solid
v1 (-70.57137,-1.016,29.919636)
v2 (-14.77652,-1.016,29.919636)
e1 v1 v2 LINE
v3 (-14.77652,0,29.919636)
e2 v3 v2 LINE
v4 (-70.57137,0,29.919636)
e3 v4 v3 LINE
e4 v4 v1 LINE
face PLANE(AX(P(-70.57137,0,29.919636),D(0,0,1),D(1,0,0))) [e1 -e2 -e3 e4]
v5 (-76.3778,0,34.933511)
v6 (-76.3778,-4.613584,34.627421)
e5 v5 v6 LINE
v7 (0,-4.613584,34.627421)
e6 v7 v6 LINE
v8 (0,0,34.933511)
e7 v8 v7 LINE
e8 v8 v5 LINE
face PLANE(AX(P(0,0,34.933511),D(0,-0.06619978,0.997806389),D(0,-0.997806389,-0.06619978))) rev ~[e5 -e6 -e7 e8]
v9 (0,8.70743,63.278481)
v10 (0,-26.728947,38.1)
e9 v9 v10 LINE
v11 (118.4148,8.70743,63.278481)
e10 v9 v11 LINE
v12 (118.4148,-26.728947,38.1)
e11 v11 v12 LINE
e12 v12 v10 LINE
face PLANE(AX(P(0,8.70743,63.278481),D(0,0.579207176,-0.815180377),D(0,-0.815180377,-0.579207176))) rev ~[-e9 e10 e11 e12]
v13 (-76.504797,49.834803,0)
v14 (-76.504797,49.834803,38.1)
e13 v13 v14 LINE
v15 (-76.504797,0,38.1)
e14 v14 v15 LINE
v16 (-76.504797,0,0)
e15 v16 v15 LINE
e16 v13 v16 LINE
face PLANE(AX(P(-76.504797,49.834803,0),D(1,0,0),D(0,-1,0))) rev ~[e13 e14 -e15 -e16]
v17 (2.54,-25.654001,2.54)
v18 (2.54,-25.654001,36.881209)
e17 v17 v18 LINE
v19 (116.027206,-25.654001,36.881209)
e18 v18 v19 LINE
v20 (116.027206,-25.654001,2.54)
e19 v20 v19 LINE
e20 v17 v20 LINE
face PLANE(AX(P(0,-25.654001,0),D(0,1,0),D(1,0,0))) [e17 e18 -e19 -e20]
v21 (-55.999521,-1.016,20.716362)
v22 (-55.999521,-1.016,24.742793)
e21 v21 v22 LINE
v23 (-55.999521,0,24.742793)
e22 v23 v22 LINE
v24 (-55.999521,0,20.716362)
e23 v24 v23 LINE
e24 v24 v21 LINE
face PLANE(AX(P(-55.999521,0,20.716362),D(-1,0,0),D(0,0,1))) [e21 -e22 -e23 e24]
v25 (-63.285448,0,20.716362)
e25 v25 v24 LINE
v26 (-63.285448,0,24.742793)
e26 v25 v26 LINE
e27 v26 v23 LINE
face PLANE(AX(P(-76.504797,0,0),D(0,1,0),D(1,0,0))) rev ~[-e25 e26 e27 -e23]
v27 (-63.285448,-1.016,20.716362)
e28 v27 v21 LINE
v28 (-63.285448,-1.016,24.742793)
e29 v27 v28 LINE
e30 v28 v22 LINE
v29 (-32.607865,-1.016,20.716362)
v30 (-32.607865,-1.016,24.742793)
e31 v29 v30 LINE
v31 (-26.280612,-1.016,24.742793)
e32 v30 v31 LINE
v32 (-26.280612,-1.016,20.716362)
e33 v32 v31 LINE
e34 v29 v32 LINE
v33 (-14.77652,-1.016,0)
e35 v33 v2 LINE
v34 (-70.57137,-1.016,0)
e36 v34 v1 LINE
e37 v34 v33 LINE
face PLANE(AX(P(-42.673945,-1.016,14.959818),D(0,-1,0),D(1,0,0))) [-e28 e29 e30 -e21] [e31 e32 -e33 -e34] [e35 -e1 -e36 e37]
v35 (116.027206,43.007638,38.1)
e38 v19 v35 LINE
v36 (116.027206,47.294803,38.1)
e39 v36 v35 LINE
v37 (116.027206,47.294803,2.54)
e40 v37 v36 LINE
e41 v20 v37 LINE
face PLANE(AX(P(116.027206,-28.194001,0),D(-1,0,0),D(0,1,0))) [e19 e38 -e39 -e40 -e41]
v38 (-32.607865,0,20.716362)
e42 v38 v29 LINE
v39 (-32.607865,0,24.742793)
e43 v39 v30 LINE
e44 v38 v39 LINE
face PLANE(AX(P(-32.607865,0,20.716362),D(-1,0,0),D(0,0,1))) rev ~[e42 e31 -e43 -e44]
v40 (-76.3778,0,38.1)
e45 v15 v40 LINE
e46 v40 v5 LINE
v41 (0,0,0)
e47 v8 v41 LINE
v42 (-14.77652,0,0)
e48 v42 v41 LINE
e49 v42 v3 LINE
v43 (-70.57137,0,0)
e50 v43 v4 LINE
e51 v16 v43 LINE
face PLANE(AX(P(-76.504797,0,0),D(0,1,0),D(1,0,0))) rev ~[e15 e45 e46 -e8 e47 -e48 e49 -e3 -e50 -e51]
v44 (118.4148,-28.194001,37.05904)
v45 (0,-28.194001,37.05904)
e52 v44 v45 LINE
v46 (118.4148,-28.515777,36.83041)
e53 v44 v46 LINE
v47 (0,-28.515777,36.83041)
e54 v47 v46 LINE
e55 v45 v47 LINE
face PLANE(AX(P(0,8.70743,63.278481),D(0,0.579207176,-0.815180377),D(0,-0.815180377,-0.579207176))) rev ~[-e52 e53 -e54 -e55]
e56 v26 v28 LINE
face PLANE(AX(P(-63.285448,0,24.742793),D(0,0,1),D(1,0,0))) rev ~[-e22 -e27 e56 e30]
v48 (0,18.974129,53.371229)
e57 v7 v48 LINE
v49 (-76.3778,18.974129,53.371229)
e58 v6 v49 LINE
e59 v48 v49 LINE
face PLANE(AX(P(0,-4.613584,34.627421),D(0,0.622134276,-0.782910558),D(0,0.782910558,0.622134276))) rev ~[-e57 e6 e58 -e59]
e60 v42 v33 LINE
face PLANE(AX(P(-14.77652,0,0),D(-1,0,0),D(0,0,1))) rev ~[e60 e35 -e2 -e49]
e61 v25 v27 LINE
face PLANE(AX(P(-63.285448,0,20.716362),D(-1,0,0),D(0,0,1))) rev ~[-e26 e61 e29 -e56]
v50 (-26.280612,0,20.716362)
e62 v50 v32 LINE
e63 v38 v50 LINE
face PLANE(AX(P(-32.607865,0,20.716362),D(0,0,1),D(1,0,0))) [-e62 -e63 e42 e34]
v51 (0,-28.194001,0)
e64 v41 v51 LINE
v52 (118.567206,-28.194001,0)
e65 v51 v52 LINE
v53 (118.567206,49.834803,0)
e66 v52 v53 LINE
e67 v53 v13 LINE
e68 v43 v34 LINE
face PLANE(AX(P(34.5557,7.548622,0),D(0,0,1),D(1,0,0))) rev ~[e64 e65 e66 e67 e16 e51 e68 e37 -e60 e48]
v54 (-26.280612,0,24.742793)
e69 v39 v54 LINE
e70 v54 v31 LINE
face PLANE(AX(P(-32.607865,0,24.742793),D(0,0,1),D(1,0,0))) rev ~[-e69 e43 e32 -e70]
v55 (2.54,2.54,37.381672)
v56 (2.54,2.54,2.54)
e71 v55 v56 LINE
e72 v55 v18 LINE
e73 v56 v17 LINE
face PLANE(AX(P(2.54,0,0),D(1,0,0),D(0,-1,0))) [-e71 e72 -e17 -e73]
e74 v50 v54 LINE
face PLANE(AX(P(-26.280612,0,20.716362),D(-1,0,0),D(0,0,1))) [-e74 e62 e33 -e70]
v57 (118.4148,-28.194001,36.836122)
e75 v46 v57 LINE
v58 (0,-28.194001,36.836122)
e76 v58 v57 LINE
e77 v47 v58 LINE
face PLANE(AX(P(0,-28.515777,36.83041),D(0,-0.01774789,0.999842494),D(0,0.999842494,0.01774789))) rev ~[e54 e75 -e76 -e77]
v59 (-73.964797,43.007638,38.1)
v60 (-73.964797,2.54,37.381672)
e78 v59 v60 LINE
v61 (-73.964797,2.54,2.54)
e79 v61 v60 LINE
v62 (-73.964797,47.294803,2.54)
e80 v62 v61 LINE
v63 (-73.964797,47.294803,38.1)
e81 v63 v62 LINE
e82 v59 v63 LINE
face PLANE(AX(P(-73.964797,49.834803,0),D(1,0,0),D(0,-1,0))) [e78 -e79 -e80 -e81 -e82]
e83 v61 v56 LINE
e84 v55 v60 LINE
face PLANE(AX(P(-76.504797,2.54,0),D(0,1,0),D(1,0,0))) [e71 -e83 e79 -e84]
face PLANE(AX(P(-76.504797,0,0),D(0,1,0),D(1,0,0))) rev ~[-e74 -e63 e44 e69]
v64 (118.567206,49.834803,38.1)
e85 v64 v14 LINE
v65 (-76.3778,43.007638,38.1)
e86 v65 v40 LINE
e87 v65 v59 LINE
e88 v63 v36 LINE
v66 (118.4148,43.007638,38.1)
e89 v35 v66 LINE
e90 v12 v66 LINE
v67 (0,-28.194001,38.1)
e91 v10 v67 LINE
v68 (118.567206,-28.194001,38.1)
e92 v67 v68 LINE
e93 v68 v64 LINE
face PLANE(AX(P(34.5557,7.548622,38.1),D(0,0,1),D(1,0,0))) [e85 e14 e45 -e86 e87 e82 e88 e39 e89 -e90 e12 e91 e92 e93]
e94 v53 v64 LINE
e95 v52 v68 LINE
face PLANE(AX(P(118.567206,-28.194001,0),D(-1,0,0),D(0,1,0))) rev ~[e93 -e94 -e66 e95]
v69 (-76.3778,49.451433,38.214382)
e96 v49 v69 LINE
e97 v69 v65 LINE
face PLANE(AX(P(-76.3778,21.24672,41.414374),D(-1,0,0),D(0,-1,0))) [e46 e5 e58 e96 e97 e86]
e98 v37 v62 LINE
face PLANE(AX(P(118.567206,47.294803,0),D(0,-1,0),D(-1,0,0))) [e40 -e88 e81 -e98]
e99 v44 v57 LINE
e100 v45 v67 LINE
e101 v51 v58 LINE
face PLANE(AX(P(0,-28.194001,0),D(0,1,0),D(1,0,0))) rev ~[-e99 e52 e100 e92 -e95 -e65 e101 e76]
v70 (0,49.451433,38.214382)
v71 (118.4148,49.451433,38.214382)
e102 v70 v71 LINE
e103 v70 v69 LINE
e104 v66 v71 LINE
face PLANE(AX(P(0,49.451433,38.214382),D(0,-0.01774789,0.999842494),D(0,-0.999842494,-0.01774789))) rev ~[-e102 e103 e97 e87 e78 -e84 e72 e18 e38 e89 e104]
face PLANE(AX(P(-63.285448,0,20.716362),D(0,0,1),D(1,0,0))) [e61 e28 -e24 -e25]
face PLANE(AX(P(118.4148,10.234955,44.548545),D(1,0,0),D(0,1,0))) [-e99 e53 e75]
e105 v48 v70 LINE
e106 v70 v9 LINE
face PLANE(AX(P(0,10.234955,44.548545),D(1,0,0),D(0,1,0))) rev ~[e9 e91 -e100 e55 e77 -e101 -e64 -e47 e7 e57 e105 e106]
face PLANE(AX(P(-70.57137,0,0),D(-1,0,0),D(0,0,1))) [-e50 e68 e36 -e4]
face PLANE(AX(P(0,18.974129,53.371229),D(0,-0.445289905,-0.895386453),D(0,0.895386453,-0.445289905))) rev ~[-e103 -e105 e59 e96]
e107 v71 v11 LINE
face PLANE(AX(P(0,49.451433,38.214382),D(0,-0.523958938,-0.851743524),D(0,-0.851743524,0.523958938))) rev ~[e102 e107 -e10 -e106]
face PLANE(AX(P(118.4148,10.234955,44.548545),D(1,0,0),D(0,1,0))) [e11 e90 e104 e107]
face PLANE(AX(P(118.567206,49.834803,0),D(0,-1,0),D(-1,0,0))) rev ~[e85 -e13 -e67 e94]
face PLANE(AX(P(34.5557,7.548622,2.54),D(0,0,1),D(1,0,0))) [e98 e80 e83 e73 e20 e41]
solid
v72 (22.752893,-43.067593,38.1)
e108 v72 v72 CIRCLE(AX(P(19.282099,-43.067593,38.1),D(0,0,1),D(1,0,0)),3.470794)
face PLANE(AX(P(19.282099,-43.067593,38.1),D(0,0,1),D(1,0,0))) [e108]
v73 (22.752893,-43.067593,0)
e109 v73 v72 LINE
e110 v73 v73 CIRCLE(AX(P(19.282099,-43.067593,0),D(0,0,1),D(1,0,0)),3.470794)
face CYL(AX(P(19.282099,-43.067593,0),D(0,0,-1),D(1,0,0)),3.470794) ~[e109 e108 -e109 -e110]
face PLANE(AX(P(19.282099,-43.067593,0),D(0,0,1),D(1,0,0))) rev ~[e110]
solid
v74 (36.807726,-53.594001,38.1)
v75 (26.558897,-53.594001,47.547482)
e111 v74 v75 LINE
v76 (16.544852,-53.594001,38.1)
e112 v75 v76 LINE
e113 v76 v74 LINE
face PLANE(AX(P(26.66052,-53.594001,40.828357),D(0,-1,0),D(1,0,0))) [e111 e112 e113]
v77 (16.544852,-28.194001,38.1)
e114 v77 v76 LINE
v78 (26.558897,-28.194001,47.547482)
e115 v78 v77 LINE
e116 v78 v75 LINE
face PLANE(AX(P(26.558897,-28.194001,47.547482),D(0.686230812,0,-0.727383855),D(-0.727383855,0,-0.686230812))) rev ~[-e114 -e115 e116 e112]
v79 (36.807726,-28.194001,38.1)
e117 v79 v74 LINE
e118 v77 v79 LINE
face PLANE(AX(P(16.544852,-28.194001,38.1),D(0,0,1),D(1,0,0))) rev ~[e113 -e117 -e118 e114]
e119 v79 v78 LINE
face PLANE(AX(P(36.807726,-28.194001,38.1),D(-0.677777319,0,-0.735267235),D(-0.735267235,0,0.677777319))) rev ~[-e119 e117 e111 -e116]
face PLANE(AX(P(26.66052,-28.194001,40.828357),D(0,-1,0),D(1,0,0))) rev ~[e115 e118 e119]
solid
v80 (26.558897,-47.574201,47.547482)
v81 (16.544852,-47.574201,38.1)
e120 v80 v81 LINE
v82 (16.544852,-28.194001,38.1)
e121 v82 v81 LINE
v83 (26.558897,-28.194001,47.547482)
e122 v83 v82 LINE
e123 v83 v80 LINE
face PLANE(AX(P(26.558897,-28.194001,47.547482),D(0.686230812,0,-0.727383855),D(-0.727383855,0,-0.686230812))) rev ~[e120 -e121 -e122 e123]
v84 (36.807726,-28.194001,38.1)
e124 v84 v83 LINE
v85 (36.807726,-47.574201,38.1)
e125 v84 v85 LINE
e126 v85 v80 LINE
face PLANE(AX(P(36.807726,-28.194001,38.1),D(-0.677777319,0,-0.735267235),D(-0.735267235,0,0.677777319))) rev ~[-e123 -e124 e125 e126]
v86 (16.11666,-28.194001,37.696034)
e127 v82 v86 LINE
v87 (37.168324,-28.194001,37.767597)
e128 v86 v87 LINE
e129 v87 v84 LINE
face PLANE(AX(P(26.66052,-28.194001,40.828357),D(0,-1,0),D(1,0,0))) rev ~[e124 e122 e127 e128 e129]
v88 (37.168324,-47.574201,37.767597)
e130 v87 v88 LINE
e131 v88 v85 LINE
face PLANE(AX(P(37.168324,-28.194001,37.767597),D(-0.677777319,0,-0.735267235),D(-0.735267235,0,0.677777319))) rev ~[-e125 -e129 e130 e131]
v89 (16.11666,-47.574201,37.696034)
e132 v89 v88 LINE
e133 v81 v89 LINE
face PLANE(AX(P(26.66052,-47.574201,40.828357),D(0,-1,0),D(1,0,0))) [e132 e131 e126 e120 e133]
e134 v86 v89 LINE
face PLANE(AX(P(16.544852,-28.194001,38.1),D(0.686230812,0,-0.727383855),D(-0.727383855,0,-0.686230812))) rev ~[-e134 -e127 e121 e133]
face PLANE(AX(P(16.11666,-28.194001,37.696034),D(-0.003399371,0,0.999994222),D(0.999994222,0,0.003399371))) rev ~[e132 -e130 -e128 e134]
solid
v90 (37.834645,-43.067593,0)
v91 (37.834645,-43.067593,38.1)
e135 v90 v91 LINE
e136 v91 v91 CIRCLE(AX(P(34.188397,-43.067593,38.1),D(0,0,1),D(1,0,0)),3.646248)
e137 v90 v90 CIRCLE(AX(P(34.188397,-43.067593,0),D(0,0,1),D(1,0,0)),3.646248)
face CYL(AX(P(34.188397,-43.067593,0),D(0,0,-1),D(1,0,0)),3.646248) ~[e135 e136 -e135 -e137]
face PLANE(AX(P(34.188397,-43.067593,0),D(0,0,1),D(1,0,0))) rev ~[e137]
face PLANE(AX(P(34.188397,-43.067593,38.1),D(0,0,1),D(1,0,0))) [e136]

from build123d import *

# Parameters (mm, degrees)
F0_W      = 1.8879286945
F0_H      = 11.4653147757
F0_W_2    = 1.7881840467
F0_H_2    = 24.578695884
F0_W_3    = 13.0486488342
F0_H_3    = 2.4496505503
F1_DEPTH  = 38.1
F2_T      = -2.54
F3_R      = 3.6462481821
F4_DEPTH  = 38.1
F3_R_2    = 3.4707937143
F6_DEPTH  = 118.4148
F10_DEPTH = 76.3778
F11_W     = 55.7948499918
F11_H     = 29.9196355045
F11_W_2   = 7.285926491
F11_H_2   = 4.0264315903
F11_W_3   = 6.327252835
F12_DEPTH = 1.016
F14_DEPTH = 19.3802
F17_DEPTH = 25.4


# Not quite as in the source:
# - the program builds the solid bodies; features that only make, move or delete a surface that nothing else refers to are left out


with BuildPart() as f1:
    # F0 (on Top) → F1 (new body)
    with BuildSketch(Plane.XY):
        Polygon((115.5052706599, 46.1629368365), (0, 46.1629368365), (0, 36.2635403872), (5.0127906725, 33.348493278), (3.9305194266, 31.4873915519), (-2.1358516533, 33.348493278), (-2.1358516533, 46.1629368365), (-73.9798247814, 46.1629368365), (-73.9798247814, 2.8401890304), (-2.1358516533, 2.8401890304), (-2.1358516533, 25.5750287324), (0, 25.5750287324), (0, 0), (32.6135978103, 0), (32.6135978103, -10.8203999698), (36.2712033093, -12.9540003836), (34.8249944744, -15.4332187757), (30.5749002367, -12.9540003836), (30.5749002367, -1.6563893296), (2.5344253518, -1.6563893296), (2.5344253518, -27.0283464342), (30.5749002367, -27.0283464342), (30.5749002367, -18.0092640221), (32.6135978103, -18.0092640221), (32.6135978103, -27.0283464342), (48.8130263984, -27.0283464342), (48.8130263984, -15.5630316585), (50.7009550929, -15.5630316585), (50.7009550929, -27.0283464342), (79.7093436122, -27.0283464342), (79.7093436122, -2.4496505503), (50.7009550929, -2.4496505503), (50.7009550929, -7.0923493578), (52.741076349, -6.0931874175), (53.6812692881, -8.0129038543), (48.8130263984, -10.3971557692), (48.8130263984, 0), (93.6689444834, 0), (97.4417412263, -6.2941650698), (95.5842658877, -7.4075576849), (92.6124379039, -2.4496505503), (81.4975276589, -2.4496505503), (81.4975276589, -27.0283464342), (115.5052706599, -27.0283464342), (115.5052706599, -2.4496505503), (102.4566218257, -2.4496505503), (102.4566218257, 0), (115.5052706599, 0), align=None)
        Polygon((0, 46.1629368365), (0, 49.8348027468), (-76.5047967434, 49.8348027468), (-76.5047967434, 0), (0, 0), (0, 25.5750287324), (-2.1358516533, 25.5750287324), (-2.1358516533, 2.8401890304), (-73.9798247814, 2.8401890304), (-73.9798247814, 46.1629368365), (-2.1358516533, 46.1629368365), (-2.1358516533, 33.348493278), (3.9305194266, 31.4873915519), (5.0127906725, 33.348493278), (0, 36.2635403872), align=None)
        Polygon((32.6135978103, 0), (0, 0), (0, -28.1940009445), (32.6135978103, -28.1940009445), (32.6135978103, -27.0283464342), (32.6135978103, -18.0092640221), (30.5749002367, -18.0092640221), (30.5749002367, -27.0283464342), (2.5344253518, -27.0283464342), (2.5344253518, -1.6563893296), (30.5749002367, -1.6563893296), (30.5749002367, -12.9540003836), (34.8249944744, -15.4332187757), (36.2712033093, -12.9540003836), (32.6135978103, -10.8203999698), align=None)
        with Locations((49.7569907457, -21.2956890464)):
            Rectangle(F0_W, F0_H)
        Polygon((32.6135978103, -28.1940009445), (50.7009550929, -28.1940009445), (50.7009550929, -27.0283464342), (48.8130263984, -27.0283464342), (32.6135978103, -27.0283464342), align=None)
        Polygon((50.7009550929, -2.4496505503), (79.7093436122, -2.4496505503), (81.4975276589, -2.4496505503), (92.6124379039, -2.4496505503), (95.5842658877, -7.4075576849), (97.4417412263, -6.2941650698), (93.6689444834, 0), (48.8130263984, 0), (48.8130263984, -10.3971557692), (53.6812692881, -8.0129038543), (52.741076349, -6.0931874175), (50.7009550929, -7.0923493578), align=None)
        with Locations((80.6034356356, -14.7389984922)):
            Rectangle(F0_W_2, F0_H_2)
        Polygon((118.5672059655, 49.8348027468), (0, 49.8348027468), (0, 46.1629368365), (115.5052706599, 46.1629368365), (115.5052706599, 0), (115.5052706599, -2.4496505503), (115.5052706599, -27.0283464342), (81.4975276589, -27.0283464342), (79.7093436122, -27.0283464342), (50.7009550929, -27.0283464342), (50.7009550929, -28.1940009445), (118.5672059655, -28.1940009445), align=None)
        with Locations((108.9809462428, -1.2248252751)):
            Rectangle(F0_W_3, F0_H_3)
    extrude(amount=F1_DEPTH)

    # F2
    f2_openings = [f1.faces().sort_by_distance(p)[0] for p in [
        (30.819232, 14.934392, 38.1),
    ]]
    offset(amount=F2_T, openings=f2_openings, kind=Kind.INTERSECTION)

    # F5 (on Right) → F6 (join)
    with BuildSketch(Plane.YZ):
        Polygon((8.7074302137, 63.2784813643), (-28.5157766193, 36.8304103613), (49.4514331222, 38.2143817842), align=None)
    extrude(amount=F6_DEPTH)

    # F9 (on face) → F10 (join)
    with BuildSketch(Plane(origin=(0, 0, 0), x_dir=(0, -1, 0), z_dir=(-1, 0, 0))):
        Polygon((-18.9741293217, 53.3712290613), (-49.4514331222, 38.2143817842), (-2.54, 37.3816716864), (-2.54, 38.1), (0, 38.1), (0, 34.9335108109), (4.6135843263, 34.6274210994), align=None)
    extrude(amount=F10_DEPTH)

    # F11 (on face) → F12 (join)
    with BuildSketch(Plane.XZ):
        with Locations((-42.6739454269, 14.9598177522)):
            Rectangle(F11_W, F11_H)
        with Locations((-59.6424844116, 22.7295774966)):
            Rectangle(F11_W_2, F11_H_2, mode=Mode.SUBTRACT)
        with Locations((-29.444238171, 22.7295774966)):
            Rectangle(F11_W_3, F11_H_2, mode=Mode.SUBTRACT)
    extrude(amount=F12_DEPTH)


with BuildPart() as f4:
    # F3 (on Top) → F4 (new body)
    with BuildSketch(Plane.XY):
        with Locations((34.1883972287, -43.0675931275)):
            Circle(F3_R)
    extrude(amount=F4_DEPTH)


with BuildPart() as f4b:
    # F3 (on Top) → F4, piece 2 (new body)
    with BuildSketch(Plane.XY):
        with Locations((19.2820988595, -43.0675931275)):
            Circle(F3_R_2)
    extrude(amount=F4_DEPTH)


with BuildPart() as f14:
    # F13 (on face) → F14 (new body)
    with BuildSketch(Plane.XZ.offset(28.1940009445)):
        Polygon((26.5588965267, 47.5474819541), (16.544852101, 38.1), (36.8077256615, 38.1), align=None)
        Polygon((16.544852101, 38.1), (16.1166600883, 37.6960337162), (37.1683239937, 37.7675965428), (36.8077256615, 38.1), align=None)
    extrude(amount=F14_DEPTH)


with BuildPart() as f17:
    # F13 (on face) → F17 (new body)
    with BuildSketch(Plane.XZ.offset(28.1940009445)):
        Polygon((26.5588965267, 47.5474819541), (16.544852101, 38.1), (36.8077256615, 38.1), align=None)
    extrude(amount=F17_DEPTH)


solid = Compound([f1.part, f4.part, f4b.part, f14.part, f17.part])
